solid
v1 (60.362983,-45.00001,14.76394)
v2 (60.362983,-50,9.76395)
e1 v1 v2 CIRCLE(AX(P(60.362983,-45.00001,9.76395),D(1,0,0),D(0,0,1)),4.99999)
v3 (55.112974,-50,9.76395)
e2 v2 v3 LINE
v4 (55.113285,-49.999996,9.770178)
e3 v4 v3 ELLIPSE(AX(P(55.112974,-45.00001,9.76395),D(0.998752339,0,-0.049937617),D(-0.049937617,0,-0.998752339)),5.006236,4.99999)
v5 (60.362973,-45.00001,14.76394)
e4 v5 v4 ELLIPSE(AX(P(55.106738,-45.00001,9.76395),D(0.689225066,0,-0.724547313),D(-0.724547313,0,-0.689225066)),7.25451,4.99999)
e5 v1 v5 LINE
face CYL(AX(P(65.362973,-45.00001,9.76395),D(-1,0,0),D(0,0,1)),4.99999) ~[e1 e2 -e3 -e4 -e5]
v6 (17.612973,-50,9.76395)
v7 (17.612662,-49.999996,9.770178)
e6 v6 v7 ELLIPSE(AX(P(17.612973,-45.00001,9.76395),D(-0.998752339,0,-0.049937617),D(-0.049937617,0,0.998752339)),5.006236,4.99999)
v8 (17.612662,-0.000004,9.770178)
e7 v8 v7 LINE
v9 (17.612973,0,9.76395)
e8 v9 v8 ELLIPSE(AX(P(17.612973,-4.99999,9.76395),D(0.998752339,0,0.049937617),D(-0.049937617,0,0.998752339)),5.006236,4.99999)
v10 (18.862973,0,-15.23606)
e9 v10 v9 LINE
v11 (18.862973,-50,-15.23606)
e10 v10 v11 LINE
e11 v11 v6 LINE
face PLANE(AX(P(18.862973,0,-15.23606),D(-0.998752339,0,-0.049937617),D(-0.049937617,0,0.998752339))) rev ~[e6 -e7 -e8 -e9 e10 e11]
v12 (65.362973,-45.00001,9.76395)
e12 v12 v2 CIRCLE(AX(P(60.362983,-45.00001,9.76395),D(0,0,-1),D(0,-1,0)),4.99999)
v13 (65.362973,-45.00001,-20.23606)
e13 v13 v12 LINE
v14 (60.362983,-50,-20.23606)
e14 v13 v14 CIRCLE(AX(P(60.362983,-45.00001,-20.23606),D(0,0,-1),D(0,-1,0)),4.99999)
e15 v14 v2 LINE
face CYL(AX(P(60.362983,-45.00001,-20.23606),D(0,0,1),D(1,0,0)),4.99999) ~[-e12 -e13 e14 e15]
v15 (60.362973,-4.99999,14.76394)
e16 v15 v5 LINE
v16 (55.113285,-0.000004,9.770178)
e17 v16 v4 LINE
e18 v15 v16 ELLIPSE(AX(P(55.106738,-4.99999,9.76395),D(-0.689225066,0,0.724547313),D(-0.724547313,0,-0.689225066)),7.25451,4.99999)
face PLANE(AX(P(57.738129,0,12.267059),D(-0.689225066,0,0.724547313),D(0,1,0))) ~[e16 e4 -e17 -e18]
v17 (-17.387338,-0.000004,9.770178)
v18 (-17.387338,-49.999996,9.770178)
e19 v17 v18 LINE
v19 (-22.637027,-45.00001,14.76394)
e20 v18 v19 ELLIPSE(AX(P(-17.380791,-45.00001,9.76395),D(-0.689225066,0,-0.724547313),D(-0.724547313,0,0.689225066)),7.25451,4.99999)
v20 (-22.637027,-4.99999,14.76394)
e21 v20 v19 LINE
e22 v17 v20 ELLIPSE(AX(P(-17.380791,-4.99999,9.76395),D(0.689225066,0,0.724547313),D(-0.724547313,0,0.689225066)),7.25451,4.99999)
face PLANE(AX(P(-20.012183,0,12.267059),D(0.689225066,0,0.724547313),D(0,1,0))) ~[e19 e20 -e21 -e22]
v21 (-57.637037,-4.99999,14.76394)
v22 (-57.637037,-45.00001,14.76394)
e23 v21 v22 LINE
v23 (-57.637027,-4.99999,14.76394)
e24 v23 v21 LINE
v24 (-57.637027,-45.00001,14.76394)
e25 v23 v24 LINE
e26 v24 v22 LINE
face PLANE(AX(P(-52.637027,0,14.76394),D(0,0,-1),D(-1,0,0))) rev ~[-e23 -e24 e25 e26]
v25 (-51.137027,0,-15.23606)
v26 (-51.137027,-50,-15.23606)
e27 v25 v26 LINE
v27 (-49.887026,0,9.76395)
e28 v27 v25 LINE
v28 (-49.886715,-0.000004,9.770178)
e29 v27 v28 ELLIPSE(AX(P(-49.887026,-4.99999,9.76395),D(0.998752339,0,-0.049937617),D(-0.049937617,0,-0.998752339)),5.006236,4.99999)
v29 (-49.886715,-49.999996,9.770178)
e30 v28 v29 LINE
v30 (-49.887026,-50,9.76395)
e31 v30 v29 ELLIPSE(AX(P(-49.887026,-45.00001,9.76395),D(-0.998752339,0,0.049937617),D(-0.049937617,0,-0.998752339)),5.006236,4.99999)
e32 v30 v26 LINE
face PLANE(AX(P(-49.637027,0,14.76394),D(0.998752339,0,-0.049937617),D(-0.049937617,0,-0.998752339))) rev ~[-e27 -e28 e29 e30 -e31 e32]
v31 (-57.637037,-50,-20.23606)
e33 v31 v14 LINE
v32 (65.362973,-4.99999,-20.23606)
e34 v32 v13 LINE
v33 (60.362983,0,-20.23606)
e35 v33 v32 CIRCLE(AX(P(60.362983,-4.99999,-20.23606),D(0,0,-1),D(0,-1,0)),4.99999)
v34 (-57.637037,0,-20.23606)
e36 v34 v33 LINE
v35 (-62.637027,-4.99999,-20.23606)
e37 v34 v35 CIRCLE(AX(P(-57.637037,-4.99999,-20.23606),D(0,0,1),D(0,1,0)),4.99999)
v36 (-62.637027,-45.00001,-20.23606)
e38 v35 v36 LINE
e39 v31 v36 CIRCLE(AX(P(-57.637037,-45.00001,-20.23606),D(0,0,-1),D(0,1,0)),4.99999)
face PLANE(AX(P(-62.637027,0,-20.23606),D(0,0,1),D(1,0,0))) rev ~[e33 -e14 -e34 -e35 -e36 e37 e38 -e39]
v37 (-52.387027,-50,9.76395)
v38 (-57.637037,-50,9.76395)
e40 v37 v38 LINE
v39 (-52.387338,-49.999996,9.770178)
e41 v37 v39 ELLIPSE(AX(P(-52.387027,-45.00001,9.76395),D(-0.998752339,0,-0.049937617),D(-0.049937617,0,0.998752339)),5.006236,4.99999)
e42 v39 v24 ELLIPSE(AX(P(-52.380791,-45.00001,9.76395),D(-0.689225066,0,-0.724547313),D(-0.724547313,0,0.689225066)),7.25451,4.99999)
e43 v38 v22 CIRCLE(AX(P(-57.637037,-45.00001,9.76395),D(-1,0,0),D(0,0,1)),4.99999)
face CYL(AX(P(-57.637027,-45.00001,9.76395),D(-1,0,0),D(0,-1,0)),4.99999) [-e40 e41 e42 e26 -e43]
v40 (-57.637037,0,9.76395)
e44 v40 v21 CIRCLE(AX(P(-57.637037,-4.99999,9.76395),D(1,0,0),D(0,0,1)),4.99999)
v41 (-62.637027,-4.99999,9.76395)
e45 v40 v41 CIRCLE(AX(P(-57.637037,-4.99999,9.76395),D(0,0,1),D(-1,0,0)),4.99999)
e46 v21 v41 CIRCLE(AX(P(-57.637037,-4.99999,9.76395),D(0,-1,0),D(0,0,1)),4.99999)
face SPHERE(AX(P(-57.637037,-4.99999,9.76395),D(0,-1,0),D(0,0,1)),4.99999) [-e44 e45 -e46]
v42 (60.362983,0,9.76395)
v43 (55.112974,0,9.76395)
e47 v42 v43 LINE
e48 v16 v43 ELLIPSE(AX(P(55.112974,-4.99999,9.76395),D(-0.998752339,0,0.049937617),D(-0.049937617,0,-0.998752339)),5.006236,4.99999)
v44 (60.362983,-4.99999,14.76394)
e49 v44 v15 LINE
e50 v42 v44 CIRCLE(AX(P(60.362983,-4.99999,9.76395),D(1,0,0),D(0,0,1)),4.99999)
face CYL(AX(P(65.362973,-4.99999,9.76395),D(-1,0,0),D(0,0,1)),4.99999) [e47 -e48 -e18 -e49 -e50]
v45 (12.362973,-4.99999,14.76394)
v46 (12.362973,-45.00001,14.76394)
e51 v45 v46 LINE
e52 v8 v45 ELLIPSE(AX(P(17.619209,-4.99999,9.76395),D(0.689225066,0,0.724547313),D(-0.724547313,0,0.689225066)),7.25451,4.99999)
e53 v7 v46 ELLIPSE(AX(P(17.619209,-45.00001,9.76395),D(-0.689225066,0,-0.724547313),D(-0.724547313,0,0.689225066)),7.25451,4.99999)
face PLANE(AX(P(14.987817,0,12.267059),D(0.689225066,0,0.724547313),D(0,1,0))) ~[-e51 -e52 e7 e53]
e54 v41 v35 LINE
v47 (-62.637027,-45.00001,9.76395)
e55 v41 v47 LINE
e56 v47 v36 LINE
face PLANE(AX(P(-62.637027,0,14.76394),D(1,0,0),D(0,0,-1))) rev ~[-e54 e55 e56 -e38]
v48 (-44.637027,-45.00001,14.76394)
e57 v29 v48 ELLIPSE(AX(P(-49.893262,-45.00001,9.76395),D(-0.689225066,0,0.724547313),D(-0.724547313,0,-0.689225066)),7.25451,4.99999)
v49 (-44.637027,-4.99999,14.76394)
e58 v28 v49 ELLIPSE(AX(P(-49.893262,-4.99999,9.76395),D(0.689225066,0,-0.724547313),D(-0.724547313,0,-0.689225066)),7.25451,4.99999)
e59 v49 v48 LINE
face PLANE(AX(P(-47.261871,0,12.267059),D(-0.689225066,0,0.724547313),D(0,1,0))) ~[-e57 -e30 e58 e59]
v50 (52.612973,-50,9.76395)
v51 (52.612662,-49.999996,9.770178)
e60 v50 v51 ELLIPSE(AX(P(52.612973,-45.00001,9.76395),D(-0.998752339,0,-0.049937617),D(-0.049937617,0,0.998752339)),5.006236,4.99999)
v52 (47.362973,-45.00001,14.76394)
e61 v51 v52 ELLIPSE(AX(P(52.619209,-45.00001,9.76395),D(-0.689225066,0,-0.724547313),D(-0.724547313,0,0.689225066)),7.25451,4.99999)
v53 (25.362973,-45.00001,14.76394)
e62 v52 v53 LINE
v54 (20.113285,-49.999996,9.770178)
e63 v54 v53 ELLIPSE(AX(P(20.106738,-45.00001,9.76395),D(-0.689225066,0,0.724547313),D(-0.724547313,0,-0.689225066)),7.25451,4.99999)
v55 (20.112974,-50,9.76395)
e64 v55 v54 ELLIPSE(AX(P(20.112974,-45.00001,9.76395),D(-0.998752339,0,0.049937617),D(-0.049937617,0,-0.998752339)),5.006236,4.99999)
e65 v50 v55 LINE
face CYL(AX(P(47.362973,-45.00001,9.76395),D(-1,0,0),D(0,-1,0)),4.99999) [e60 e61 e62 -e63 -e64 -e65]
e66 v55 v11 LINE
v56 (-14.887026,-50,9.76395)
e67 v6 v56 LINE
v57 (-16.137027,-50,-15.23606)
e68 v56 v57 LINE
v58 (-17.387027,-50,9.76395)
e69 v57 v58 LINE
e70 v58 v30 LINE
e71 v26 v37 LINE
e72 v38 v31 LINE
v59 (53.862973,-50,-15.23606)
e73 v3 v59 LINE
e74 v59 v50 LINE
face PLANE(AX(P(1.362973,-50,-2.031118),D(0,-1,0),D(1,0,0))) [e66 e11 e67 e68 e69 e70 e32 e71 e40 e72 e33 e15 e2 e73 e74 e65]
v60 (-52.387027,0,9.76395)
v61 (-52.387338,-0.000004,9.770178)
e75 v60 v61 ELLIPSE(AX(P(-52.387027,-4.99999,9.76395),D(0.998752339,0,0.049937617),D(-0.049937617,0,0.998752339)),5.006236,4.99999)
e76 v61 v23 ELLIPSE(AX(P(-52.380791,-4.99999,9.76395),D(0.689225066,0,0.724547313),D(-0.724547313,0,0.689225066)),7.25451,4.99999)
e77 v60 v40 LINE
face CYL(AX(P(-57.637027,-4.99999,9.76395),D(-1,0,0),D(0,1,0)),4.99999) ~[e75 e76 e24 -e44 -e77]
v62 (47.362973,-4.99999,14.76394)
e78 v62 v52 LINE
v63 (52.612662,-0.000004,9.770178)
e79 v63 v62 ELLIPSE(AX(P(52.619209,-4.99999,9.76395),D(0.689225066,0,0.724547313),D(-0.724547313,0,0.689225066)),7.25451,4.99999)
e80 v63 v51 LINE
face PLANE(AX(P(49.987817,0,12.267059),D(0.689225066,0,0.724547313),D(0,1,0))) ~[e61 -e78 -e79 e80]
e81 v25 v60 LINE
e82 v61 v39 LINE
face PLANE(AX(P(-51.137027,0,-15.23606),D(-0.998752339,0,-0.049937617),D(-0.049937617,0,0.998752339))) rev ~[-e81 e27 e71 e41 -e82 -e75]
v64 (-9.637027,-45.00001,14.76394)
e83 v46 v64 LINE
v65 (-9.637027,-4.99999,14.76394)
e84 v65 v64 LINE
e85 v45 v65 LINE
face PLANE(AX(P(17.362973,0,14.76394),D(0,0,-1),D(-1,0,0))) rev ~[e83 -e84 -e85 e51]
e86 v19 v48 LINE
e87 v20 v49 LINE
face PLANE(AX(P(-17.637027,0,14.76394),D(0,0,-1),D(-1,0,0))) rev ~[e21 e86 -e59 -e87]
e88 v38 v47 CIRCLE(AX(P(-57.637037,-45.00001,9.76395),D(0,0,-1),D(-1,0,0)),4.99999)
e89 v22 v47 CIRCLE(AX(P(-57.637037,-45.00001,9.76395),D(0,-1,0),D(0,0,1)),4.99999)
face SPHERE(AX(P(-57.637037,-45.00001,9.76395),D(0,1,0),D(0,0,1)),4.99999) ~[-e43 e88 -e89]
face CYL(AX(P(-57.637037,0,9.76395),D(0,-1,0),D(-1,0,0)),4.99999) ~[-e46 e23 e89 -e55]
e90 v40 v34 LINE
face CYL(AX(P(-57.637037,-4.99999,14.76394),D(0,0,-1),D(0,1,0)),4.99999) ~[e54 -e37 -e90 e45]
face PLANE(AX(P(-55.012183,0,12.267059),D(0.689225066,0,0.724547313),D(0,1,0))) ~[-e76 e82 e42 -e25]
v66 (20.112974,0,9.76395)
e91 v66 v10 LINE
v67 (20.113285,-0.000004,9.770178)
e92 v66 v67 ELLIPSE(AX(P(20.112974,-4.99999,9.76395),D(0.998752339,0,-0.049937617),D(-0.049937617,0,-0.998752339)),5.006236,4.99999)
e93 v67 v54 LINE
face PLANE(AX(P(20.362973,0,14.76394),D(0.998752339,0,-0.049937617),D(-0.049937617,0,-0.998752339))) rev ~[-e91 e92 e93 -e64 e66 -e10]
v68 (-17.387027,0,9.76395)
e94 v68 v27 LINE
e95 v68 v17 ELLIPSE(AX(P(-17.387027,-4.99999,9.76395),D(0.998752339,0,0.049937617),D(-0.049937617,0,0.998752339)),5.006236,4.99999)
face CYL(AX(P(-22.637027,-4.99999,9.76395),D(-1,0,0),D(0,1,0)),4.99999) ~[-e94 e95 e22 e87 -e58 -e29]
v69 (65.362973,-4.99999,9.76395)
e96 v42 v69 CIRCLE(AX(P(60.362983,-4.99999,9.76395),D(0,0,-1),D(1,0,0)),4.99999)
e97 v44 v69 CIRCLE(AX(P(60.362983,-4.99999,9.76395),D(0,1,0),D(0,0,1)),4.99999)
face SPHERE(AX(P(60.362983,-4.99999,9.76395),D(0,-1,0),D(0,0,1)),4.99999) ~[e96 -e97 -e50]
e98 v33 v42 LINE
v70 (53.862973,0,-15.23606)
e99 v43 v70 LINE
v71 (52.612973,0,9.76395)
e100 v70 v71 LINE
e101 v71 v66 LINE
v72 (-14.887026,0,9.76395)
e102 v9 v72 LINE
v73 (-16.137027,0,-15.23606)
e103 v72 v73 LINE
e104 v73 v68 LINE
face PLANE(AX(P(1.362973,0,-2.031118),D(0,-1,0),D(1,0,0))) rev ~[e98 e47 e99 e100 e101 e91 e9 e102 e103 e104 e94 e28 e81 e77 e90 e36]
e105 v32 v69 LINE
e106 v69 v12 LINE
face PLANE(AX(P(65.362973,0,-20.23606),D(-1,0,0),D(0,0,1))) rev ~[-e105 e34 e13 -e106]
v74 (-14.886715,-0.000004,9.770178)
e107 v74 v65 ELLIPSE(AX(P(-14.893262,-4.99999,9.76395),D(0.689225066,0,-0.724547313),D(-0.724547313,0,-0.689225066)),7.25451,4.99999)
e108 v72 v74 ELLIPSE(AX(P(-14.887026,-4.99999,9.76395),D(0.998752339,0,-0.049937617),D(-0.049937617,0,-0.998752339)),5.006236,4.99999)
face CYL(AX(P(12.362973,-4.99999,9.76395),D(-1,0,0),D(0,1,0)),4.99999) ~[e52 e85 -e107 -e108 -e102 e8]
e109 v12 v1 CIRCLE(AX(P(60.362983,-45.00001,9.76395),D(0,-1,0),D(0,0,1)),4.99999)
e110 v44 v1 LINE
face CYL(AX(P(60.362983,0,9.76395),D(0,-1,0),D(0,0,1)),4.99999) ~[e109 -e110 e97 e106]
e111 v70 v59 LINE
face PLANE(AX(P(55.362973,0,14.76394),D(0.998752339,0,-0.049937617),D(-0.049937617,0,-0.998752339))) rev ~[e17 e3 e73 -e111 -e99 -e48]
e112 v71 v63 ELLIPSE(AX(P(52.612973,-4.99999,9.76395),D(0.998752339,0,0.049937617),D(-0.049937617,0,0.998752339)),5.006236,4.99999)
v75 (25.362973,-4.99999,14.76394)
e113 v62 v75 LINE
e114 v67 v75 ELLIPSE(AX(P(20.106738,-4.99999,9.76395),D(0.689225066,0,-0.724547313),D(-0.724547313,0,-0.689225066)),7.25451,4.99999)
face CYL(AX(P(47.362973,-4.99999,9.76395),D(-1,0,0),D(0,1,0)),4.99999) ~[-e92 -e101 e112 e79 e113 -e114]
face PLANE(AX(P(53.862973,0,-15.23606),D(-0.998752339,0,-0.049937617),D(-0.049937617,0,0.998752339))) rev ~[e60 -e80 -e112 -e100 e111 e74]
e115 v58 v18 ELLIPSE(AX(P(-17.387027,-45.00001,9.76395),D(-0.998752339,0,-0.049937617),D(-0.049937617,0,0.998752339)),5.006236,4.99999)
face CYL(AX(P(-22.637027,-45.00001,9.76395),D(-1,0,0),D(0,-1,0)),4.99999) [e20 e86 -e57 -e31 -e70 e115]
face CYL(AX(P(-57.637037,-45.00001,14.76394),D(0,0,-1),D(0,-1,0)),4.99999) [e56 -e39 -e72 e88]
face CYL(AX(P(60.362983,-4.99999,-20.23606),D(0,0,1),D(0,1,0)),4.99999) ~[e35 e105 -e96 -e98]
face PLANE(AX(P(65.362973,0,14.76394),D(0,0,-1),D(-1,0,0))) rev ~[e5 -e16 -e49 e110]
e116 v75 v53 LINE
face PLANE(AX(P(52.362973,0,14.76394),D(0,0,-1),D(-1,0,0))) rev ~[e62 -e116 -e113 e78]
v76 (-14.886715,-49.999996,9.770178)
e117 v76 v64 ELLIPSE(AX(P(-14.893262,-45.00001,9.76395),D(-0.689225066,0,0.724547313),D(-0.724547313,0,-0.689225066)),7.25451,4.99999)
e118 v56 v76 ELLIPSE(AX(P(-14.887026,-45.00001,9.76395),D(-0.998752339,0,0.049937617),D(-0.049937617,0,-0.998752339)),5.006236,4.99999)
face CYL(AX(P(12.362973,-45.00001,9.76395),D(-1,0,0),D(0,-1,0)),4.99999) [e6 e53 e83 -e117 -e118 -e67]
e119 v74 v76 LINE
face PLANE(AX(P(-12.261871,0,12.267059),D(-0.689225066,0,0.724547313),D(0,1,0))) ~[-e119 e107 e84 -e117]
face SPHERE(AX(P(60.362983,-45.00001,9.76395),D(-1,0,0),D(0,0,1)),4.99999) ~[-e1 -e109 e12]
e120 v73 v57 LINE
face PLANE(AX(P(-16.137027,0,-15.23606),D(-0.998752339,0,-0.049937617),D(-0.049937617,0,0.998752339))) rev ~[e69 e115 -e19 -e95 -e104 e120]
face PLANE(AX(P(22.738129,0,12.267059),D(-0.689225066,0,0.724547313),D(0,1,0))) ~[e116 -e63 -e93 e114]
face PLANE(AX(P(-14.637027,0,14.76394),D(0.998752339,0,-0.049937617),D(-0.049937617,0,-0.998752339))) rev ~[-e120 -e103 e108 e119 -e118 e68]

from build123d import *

# Parameters (mm, degrees)
F1_DEPTH = 50
F2_SIZE  = 5
F3_R     = 4.99999


# Not quite as in the source:
# - a fillet or chamfer is up to 0.001 mm smaller than in the source, because OpenCascade refuses the exact size


with BuildPart() as f1:
    # F0 (on Front) → F1 (new body)
    with BuildSketch(Plane.XZ):
        Polygon((-62.637026581, 14.7639395539), (-62.637026581, -20.2360604461), (65.362973419, -20.2360604461), (65.362973419, 14.7639395539), (55.362973419, 14.7639395539), (53.862973419, -15.2360604461), (52.362973419, 14.7639395539), (20.362973419, 14.7639395539), (18.862973419, -15.2360604461), (17.362973419, 14.7639395539), (-14.637026581, 14.7639395539), (-16.137026581, -15.2360604461), (-17.637026581, 14.7639395539), (-49.637026581, 14.7639395539), (-51.137026581, -15.2360604461), (-52.637026581, 14.7639395539), align=None)
    extrude(amount=F1_DEPTH)

    # F2
    f2_edges = [f1.edges().sort_by_distance(p)[0] for p in [
        (-52.637027, -25, 14.76394),
        (-49.637027, -25, 14.76394),
        (-17.637027, -25, 14.76394),
        (-14.637027, -25, 14.76394),
        (17.362973, -25, 14.76394),
        (20.362973, -25, 14.76394),
        (52.362973, -25, 14.76394),
        (55.362973, -25, 14.76394),
    ]]
    chamfer(f2_edges, length=F2_SIZE)

    # F3 (radius 5 in the source; OpenCascade refuses exactly that, so slightly less here)
    f3_edges = [f1.edges().sort_by_distance(p)[0] for p in [
        (-62.637027, -25, 14.76394),
        (-60.137027, -50, 14.76394),
        (-60.137027, 0, 14.76394),
        (-33.637027, -50, 14.76394),
        (-33.637027, 0, 14.76394),
        (1.362973, 0, 14.76394),
        (1.362973, -50, 14.76394),
        (36.362973, -50, 14.76394),
        (36.362973, 0, 14.76394),
        (62.862973, -50, 14.76394),
        (65.362973, -25, 14.76394),
        (62.862973, 0, 14.76394),
        (-62.637027, -50, -2.73606),
        (-62.637027, 0, -2.73606),
        (65.362973, -50, -2.73606),
        (65.362973, 0, -2.73606),
    ]]
    fillet(f3_edges, radius=F3_R)


solid = f1.part
